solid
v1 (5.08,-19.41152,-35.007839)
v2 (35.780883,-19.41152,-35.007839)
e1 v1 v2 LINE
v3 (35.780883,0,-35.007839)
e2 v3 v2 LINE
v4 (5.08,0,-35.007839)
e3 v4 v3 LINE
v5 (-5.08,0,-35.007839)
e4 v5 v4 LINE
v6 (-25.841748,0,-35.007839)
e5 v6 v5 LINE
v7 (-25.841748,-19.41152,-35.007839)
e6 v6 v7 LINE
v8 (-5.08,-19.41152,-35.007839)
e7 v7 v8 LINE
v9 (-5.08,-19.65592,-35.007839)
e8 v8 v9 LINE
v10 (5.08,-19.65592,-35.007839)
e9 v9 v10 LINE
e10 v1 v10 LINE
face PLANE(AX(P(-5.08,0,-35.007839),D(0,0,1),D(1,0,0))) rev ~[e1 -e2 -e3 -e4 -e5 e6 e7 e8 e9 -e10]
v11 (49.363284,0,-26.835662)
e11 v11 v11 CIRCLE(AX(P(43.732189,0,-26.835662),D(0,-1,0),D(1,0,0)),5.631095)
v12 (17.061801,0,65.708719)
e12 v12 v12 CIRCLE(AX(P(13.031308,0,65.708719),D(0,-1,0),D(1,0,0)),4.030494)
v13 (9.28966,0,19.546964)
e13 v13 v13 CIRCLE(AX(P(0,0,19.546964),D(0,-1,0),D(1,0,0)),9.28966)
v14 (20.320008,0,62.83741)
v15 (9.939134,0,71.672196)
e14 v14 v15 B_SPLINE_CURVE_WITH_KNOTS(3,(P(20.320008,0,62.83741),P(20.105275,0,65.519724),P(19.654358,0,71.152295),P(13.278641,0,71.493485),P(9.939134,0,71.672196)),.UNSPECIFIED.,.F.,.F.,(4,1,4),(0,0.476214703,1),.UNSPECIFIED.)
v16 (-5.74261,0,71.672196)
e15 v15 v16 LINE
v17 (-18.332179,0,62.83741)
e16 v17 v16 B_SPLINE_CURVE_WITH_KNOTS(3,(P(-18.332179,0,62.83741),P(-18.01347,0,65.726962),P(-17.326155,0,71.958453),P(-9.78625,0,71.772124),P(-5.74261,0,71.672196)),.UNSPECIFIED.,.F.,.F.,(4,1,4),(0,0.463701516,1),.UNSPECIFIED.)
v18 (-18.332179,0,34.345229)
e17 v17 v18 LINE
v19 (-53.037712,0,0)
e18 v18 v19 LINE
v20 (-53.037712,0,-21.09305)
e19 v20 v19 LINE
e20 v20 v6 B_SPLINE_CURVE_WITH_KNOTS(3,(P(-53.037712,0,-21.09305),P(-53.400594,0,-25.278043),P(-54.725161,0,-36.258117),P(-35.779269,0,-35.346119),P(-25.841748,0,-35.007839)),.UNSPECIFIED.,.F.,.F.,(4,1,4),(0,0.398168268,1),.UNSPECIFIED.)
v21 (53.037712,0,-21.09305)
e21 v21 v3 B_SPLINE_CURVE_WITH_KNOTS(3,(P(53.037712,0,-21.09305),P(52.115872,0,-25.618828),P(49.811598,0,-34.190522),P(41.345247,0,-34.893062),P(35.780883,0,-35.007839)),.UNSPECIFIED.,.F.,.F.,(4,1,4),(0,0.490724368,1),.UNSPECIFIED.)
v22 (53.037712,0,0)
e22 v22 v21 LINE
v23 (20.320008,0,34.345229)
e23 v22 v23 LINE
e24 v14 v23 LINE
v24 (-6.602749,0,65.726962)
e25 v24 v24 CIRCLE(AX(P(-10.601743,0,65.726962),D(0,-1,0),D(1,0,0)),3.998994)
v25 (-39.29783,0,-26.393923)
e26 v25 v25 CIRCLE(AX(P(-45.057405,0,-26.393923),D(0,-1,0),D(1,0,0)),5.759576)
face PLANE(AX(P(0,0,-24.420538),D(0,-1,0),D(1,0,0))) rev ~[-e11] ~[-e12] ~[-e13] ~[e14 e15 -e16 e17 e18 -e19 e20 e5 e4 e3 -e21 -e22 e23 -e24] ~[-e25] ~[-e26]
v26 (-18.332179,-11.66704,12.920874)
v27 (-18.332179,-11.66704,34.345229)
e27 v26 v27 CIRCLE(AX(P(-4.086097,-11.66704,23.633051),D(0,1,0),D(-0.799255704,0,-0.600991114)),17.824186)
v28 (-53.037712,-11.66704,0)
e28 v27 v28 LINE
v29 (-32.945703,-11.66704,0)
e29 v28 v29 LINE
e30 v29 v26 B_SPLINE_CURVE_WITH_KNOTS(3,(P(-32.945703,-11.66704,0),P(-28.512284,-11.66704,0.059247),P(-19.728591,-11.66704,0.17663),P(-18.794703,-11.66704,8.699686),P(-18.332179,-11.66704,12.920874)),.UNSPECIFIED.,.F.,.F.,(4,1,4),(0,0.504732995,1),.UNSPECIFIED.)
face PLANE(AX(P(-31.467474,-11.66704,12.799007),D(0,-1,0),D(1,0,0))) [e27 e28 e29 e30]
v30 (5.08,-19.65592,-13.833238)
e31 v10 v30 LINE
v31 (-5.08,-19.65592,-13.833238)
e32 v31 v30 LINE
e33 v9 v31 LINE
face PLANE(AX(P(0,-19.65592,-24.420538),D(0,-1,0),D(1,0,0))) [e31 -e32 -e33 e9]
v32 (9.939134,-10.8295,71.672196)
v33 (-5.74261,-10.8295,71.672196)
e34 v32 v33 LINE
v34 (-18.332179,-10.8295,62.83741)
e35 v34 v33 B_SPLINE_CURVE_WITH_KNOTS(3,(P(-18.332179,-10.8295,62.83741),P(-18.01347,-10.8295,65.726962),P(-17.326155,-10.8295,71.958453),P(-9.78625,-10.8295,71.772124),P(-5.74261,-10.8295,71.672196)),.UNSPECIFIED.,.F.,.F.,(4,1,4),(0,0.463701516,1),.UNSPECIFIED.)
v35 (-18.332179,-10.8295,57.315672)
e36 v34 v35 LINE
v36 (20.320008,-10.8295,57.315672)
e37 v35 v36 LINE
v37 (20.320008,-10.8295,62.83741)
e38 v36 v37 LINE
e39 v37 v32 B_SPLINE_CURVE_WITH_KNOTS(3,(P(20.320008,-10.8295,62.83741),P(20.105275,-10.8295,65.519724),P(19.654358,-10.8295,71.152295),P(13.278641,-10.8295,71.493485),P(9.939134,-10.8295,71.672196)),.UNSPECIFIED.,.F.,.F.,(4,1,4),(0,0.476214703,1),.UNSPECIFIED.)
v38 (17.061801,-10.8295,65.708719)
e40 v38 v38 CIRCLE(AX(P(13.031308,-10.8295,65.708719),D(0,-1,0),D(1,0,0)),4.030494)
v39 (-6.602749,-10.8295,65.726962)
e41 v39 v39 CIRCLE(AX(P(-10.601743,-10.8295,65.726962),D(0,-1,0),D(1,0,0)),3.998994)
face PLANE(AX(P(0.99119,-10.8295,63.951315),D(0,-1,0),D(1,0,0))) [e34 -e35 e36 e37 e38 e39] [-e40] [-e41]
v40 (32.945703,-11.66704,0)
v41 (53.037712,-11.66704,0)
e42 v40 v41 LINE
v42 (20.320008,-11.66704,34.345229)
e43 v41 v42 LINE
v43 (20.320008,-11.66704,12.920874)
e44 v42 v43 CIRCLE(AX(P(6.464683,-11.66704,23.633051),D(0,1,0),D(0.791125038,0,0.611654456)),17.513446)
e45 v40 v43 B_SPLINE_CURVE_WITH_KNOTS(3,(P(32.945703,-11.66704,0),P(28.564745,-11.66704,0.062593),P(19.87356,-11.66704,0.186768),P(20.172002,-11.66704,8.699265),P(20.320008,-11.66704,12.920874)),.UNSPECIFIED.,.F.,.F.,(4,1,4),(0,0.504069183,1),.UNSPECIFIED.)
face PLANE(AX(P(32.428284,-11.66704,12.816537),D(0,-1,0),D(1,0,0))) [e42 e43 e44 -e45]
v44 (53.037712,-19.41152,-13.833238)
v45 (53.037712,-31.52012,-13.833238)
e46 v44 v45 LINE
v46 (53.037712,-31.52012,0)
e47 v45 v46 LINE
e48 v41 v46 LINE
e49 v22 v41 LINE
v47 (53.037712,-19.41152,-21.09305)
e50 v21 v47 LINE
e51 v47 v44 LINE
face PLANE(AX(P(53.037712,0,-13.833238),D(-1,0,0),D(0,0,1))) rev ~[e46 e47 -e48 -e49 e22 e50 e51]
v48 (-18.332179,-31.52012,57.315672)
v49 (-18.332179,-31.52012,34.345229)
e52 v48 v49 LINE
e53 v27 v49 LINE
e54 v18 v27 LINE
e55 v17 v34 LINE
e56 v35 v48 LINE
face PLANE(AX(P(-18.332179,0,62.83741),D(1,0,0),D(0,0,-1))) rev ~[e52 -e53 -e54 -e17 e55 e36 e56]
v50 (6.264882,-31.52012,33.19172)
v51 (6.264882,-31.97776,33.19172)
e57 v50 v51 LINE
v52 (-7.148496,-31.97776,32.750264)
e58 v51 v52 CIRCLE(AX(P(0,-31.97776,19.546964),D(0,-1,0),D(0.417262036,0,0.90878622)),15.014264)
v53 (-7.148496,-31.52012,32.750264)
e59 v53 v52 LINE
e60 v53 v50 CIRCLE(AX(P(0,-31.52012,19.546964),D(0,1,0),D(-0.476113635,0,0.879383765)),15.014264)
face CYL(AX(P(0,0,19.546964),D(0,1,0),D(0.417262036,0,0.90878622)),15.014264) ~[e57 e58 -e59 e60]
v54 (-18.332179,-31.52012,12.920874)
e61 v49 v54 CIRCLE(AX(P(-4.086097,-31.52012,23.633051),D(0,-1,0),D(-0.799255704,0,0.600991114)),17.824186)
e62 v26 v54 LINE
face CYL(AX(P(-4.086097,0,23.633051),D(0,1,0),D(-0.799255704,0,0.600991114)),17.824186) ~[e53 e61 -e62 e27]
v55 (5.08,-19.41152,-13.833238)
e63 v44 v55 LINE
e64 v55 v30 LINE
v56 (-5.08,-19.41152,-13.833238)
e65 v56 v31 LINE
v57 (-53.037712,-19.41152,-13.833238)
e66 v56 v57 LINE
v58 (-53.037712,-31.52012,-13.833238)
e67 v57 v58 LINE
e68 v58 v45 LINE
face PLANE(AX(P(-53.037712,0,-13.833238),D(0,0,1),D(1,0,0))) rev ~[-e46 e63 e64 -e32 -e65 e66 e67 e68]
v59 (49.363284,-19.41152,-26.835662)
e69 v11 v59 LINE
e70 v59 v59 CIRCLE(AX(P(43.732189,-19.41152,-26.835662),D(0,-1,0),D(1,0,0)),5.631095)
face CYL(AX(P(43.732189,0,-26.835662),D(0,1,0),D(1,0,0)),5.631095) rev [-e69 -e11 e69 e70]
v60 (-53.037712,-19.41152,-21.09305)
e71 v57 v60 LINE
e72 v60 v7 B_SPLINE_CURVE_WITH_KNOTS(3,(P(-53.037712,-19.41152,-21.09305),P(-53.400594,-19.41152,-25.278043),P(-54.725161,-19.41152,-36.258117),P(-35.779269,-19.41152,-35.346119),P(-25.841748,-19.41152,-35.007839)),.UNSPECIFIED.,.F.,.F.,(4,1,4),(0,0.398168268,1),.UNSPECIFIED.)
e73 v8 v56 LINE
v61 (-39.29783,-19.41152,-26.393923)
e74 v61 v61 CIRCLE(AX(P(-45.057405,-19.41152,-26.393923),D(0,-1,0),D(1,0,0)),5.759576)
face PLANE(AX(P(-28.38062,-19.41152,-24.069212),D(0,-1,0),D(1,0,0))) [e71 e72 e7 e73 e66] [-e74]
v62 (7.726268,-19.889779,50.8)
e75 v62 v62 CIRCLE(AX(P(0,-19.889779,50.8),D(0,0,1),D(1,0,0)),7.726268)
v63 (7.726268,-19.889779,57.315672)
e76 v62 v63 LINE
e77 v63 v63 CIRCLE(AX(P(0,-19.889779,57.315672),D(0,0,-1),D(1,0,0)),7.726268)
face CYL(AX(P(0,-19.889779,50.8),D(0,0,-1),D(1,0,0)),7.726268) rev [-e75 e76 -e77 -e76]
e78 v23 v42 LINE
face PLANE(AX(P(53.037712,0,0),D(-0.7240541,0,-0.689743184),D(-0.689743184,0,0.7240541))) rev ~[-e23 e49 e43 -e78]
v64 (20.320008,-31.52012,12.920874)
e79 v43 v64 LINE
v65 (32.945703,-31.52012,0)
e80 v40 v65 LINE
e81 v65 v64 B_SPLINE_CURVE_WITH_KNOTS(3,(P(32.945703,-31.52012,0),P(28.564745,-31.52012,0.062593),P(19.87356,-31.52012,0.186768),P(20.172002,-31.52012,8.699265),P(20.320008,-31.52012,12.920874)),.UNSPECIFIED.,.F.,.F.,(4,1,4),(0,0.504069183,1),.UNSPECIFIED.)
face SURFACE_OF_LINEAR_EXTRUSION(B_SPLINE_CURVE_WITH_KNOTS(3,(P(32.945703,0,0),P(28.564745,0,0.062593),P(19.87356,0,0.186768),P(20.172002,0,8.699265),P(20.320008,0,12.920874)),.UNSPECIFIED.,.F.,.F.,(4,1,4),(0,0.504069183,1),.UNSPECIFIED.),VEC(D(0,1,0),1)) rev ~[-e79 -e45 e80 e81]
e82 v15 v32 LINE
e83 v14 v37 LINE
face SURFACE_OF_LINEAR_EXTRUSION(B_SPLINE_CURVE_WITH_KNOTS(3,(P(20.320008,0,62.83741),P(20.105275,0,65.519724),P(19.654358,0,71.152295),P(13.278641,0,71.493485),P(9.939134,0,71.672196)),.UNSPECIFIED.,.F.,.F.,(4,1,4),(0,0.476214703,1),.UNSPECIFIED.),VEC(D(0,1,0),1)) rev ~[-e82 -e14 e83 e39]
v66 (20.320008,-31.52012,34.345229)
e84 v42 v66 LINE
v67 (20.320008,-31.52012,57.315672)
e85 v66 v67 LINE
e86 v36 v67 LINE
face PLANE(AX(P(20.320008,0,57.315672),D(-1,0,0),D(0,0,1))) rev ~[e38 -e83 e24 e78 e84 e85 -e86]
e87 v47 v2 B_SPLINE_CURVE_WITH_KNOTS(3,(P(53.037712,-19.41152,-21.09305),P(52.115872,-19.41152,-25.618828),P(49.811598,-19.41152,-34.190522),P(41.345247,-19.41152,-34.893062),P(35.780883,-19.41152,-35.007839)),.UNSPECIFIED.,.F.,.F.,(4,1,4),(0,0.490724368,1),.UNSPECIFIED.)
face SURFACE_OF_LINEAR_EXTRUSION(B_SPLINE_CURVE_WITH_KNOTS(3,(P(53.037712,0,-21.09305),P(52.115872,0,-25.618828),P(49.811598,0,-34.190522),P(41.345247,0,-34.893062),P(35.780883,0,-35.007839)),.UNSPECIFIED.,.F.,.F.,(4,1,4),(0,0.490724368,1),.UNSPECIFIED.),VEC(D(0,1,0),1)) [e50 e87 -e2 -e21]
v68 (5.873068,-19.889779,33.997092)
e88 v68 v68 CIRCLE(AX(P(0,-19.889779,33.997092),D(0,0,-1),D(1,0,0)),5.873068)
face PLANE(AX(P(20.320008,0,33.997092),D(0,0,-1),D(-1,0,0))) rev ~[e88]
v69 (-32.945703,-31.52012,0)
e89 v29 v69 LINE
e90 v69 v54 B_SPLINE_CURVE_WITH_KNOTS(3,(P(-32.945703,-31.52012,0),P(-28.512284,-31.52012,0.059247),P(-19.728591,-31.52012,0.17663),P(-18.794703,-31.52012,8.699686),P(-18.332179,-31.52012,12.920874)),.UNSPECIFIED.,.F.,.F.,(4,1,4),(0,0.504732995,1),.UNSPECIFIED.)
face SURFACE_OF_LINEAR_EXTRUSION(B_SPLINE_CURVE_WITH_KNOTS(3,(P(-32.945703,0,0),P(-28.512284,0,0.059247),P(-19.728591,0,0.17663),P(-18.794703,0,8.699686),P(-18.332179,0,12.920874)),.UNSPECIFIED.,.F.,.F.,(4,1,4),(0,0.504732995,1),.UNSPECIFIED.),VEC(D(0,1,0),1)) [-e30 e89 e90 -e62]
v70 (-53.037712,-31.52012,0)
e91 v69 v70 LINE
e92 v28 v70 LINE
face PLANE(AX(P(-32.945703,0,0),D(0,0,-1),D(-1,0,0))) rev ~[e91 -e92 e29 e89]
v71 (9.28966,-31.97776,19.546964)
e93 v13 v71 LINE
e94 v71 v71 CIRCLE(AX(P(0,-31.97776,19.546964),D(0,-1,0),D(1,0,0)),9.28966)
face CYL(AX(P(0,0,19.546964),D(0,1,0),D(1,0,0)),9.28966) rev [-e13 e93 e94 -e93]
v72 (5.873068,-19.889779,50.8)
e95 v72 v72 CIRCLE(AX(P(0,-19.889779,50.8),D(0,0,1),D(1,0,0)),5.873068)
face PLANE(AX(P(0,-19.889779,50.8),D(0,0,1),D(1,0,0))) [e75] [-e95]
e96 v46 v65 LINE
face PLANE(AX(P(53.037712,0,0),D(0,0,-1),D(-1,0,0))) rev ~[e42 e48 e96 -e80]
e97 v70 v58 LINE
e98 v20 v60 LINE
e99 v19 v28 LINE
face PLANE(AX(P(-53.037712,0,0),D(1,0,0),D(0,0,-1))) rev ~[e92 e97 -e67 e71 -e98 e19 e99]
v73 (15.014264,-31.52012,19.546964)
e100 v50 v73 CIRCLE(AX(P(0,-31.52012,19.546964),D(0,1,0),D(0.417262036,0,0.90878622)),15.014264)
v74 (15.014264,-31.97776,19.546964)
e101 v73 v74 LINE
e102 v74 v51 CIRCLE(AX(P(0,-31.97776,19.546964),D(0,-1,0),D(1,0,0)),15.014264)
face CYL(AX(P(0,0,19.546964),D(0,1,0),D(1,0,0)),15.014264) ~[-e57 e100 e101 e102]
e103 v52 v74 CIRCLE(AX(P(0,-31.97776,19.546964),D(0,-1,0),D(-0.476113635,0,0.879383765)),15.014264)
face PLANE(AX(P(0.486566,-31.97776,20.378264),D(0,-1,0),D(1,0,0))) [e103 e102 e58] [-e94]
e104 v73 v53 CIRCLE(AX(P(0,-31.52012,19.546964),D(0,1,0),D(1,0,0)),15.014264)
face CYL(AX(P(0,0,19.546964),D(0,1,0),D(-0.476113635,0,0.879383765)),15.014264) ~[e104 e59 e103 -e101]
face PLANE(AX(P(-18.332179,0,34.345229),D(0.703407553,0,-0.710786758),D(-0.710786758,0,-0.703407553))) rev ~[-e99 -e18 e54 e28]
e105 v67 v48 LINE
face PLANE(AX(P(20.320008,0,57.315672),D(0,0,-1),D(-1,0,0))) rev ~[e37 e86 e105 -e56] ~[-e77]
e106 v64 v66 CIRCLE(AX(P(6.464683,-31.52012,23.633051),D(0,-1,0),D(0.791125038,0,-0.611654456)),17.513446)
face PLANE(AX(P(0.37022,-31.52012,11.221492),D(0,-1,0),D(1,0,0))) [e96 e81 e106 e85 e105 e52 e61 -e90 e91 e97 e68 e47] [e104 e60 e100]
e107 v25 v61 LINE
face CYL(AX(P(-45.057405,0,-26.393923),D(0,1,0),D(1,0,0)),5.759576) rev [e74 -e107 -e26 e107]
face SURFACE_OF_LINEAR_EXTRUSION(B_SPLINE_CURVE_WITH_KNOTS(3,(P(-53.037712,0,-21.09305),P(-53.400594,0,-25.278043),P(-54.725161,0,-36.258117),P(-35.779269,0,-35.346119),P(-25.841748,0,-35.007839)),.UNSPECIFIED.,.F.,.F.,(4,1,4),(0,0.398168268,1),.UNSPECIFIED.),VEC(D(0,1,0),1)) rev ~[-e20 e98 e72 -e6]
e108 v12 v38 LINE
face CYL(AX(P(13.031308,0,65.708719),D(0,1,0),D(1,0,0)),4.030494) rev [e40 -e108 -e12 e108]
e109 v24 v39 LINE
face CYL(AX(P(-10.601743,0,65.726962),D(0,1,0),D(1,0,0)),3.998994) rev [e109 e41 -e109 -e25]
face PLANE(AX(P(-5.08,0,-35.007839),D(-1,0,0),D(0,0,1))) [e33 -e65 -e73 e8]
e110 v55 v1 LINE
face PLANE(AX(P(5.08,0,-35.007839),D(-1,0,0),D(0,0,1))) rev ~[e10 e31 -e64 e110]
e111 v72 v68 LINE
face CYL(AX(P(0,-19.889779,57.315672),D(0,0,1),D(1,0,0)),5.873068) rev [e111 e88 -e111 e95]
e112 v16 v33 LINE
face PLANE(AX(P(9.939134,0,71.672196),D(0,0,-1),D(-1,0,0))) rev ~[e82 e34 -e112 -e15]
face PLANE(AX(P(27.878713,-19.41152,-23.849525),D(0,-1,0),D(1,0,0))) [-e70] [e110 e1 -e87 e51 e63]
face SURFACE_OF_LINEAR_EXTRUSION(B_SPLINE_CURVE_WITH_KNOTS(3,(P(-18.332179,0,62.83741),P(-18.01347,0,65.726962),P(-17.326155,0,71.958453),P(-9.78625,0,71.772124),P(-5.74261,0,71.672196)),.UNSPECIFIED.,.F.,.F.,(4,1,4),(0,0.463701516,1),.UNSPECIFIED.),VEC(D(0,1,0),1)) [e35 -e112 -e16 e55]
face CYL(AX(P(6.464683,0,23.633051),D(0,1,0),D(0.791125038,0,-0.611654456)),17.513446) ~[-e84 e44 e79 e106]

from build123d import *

# Parameters (mm, degrees)
F1_DEPTH  = 31.52012
F0_R      = 3.9989944529
F0_R_2    = 4.0304935081
F2_DEPTH  = 10.8295
F3_DEPTH  = 11.66704
F0_R_3    = 9.2896599899
F4_DEPTH  = 31.97776
F6_R      = 7.7262681343
F6_R_2    = 5.87306791
F7_DEPTH  = 7.37838
F9_DEPTH  = 23.31858
F0_R_4    = 5.7595758306
F0_R_5    = 5.6310949549
F10_DEPTH = 19.41152
F0_W      = 10.16
F0_H      = 21.1746012493
F11_DEPTH = 19.65592


# Not quite as in the source:
# - a feature names something its author has since deleted; it is built from what else it names
# - the program builds the solid bodies; features that only make, move or delete a surface that nothing else refers to are left out


with BuildPart() as f1:
    # F0 (on Front) → F1 (new body)
    with BuildSketch(Plane.XZ):
        with BuildLine():
            Line((-32.945703147, 0), (-53.0377118984, 0))
            Line((-53.0377118984, 0), (-53.0377118984, -13.8332377828))
            Line((-53.0377118984, -13.8332377828), (-5.08, -13.8332377828))
            Line((-5.08, -13.8332377828), (5.08, -13.8332377828))
            Line((5.08, -13.8332377828), (53.0377118984, -13.8332377828))
            Line((53.0377118984, -13.8332377828), (53.0377118984, 0))
            Line((53.0377118984, 0), (32.945703147, 0))
            add(Edge.make_bspline(
                [(32.945703147, 0), (28.5647447129, 0.0625927983), (19.8735598839, 0.1867678132), (20.1720018391, 8.6992646442), (20.3200084018, 12.9208741543)],
                knots=[0, 0, 0, 0, 0.5040691828, 1, 1, 1, 1], degree=3))
            ThreePointArc((20.3200084018, 12.9208741543), (23.9781287511, 23.6330514006), (20.3200084018, 34.345228647))
            Line((20.3200084018, 34.345228647), (20.3200084018, 57.3156722881))
            Line((20.3200084018, 57.3156722881), (-18.3321793468, 57.3156722881))
            Line((-18.3321793468, 57.3156722881), (-18.3321793468, 34.345228647))
            ThreePointArc((-18.3321793468, 34.345228647), (-21.9102829622, 23.6330514006), (-18.3321793468, 12.9208741543))
            add(Edge.make_bspline(
                [(-32.945703147, 0), (-28.5122837396, 0.0592468916), (-19.728591274, 0.176629532), (-18.7947032642, 8.6996856696), (-18.3321793468, 12.9208741543)],
                knots=[0, 0, 0, 0, 0.5047329952, 1, 1, 1, 1], degree=3))
        make_face()
        with BuildLine():
            ThreePointArc((6.2648822412, 33.191720318), (12.6390408842, 27.6514544893), (15.0142637131, 19.5469643528))
            ThreePointArc((15.0142637131, 19.5469643528), (-7.6843579979, 6.6481753784), (-7.1484956716, 32.75026411))
            ThreePointArc((-7.1484956716, 32.75026411), (-0.4938765731, 34.5531031225), (6.2648822412, 33.191720318))
        make_face(mode=Mode.SUBTRACT)
    extrude(amount=F1_DEPTH)

    # F0 (on Front) → F2 (join)
    with BuildSketch(Plane.XZ):
        with BuildLine():
            Line((-18.3321793468, 62.8374100943), (-18.3321793468, 57.3156722881))
            Line((-18.3321793468, 57.3156722881), (20.3200084018, 57.3156722881))
            Line((20.3200084018, 57.3156722881), (20.3200084018, 62.8374100943))
            add(Edge.make_bspline(
                [(20.3200084018, 62.8374100943), (20.1052749574, 65.5197235908), (19.6543576651, 71.15229537), (13.2786405866, 71.4934853371), (9.9391337225, 71.6721956254)],
                knots=[0, 0, 0, 0, 0.4762147029, 1, 1, 1, 1], degree=3))
            Line((9.9391337225, 71.6721956254), (-5.7426103852, 71.6721956254))
            add(Edge.make_bspline(
                [(-18.3321793468, 62.8374100943), (-18.0134703448, 65.7269619482), (-17.326155356, 71.9584530192), (-9.7862501304, 71.772123737), (-5.7426103852, 71.6721956254)],
                knots=[0, 0, 0, 0, 0.4637015156, 1, 1, 1, 1], degree=3))
        make_face()
        with Locations((-10.6017430574, 65.7269619482)):
            Circle(F0_R, mode=Mode.SUBTRACT)
        with Locations((13.0313078181, 65.7087189627)):
            Circle(F0_R_2, mode=Mode.SUBTRACT)
    extrude(amount=F2_DEPTH)

    # F0 (on Front) → F3 (join)
    with BuildSketch(Plane.XZ):
        with BuildLine():
            Line((-18.3321793468, 34.345228647), (-53.0377118984, 0))
            Line((-53.0377118984, 0), (-32.945703147, 0))
            add(Edge.make_bspline(
                [(-32.945703147, 0), (-28.5122837396, 0.0592468916), (-19.728591274, 0.176629532), (-18.7947032642, 8.6996856696), (-18.3321793468, 12.9208741543)],
                knots=[0, 0, 0, 0, 0.5047329952, 1, 1, 1, 1], degree=3))
            ThreePointArc((-18.3321793468, 12.9208741543), (-21.9102829622, 23.6330514006), (-18.3321793468, 34.345228647))
        make_face()
        with BuildLine():
            Line((53.0377118984, 0), (20.3200084018, 34.345228647))
            ThreePointArc((20.3200084018, 34.345228647), (23.9781287511, 23.6330514006), (20.3200084018, 12.9208741543))
            add(Edge.make_bspline(
                [(32.945703147, 0), (28.5647447129, 0.0625927983), (19.8735598839, 0.1867678132), (20.1720018391, 8.6992646442), (20.3200084018, 12.9208741543)],
                knots=[0, 0, 0, 0, 0.5040691828, 1, 1, 1, 1], degree=3))
            Line((32.945703147, 0), (53.0377118984, 0))
        make_face()
    extrude(amount=F3_DEPTH)

    # F0 (on Front) → F4 (join)
    with BuildSketch(Plane.XZ):
        with BuildLine():
            ThreePointArc((-7.1484956716, 32.75026411), (-7.6843579979, 6.6481753784), (15.0142637131, 19.5469643528))
            ThreePointArc((15.0142637131, 19.5469643528), (12.6390408842, 27.6514544893), (6.2648822412, 33.191720318))
            ThreePointArc((6.2648822412, 33.191720318), (-0.4938765731, 34.5531031225), (-7.1484956716, 32.75026411))
        make_face()
        with Locations((0, 19.5469643528)):
            Circle(F0_R_3, mode=Mode.SUBTRACT)
    extrude(amount=F4_DEPTH)

    # F6 (on offset) → F7 (cut)
    with BuildSketch(Plane.XY.offset(50.8)):
        with Locations((0, -19.8897793889)):
            Circle(F6_R)
        with Locations((0, -19.8897793889)):
            Circle(F6_R_2, mode=Mode.SUBTRACT)
    extrude(amount=F7_DEPTH, mode=Mode.SUBTRACT)

    # F9 (cut): a face of the model
    f9_faces = [f1.faces().sort_by_distance(p)[0] for p in [
        (0, -19.8897793889, 57.3156722881),
    ]]
    extrude(f9_faces, amount=-F9_DEPTH, mode=Mode.SUBTRACT)

    # F0 (on Front) → F10 (join)
    with BuildSketch(Plane.XZ):
        with BuildLine():
            Line((-5.08, -13.8332377828), (-53.0377118984, -13.8332377828))
            Line((-53.0377118984, -13.8332377828), (-53.0377118984, -21.0930503504))
            add(Edge.make_bspline(
                [(-53.0377118984, -21.0930503504), (-53.4005944702, -25.2780429079), (-54.7251608325, -36.2581171884), (-35.7792689312, -35.346119388), (-25.8417483085, -35.0078390322)],
                knots=[0, 0, 0, 0, 0.3981682681, 1, 1, 1, 1], degree=3))
            Line((-25.8417483085, -35.0078390322), (-5.08, -35.0078390322))
            Line((-5.08, -35.0078390322), (-5.08, -13.8332377828))
        make_face()
        with Locations((-45.0574053683, -26.3939229293)):
            Circle(F0_R_4, mode=Mode.SUBTRACT)
        with BuildLine():
            Line((53.0377118984, -13.8332377828), (5.08, -13.8332377828))
            Line((5.08, -13.8332377828), (5.08, -35.0078390322))
            Line((5.08, -35.0078390322), (35.7808830812, -35.0078390322))
            add(Edge.make_bspline(
                [(53.0377118984, -21.0930503504), (52.1158724207, -25.6188280404), (49.8115979989, -34.1905224475), (41.3452471932, -34.893061815), (35.7808830812, -35.0078390322)],
                knots=[0, 0, 0, 0, 0.4907243677, 1, 1, 1, 1], degree=3))
            Line((53.0377118984, -21.0930503504), (53.0377118984, -13.8332377828))
        make_face()
        with Locations((43.7321887989, -26.8356617858)):
            Circle(F0_R_5, mode=Mode.SUBTRACT)
    extrude(amount=F10_DEPTH)

    # F0 (on Front) → F11 (join)
    with BuildSketch(Plane.XZ):
        with Locations((0, -24.4205384075)):
            Rectangle(F0_W, F0_H)
    extrude(amount=F11_DEPTH)


solid = f1.part
